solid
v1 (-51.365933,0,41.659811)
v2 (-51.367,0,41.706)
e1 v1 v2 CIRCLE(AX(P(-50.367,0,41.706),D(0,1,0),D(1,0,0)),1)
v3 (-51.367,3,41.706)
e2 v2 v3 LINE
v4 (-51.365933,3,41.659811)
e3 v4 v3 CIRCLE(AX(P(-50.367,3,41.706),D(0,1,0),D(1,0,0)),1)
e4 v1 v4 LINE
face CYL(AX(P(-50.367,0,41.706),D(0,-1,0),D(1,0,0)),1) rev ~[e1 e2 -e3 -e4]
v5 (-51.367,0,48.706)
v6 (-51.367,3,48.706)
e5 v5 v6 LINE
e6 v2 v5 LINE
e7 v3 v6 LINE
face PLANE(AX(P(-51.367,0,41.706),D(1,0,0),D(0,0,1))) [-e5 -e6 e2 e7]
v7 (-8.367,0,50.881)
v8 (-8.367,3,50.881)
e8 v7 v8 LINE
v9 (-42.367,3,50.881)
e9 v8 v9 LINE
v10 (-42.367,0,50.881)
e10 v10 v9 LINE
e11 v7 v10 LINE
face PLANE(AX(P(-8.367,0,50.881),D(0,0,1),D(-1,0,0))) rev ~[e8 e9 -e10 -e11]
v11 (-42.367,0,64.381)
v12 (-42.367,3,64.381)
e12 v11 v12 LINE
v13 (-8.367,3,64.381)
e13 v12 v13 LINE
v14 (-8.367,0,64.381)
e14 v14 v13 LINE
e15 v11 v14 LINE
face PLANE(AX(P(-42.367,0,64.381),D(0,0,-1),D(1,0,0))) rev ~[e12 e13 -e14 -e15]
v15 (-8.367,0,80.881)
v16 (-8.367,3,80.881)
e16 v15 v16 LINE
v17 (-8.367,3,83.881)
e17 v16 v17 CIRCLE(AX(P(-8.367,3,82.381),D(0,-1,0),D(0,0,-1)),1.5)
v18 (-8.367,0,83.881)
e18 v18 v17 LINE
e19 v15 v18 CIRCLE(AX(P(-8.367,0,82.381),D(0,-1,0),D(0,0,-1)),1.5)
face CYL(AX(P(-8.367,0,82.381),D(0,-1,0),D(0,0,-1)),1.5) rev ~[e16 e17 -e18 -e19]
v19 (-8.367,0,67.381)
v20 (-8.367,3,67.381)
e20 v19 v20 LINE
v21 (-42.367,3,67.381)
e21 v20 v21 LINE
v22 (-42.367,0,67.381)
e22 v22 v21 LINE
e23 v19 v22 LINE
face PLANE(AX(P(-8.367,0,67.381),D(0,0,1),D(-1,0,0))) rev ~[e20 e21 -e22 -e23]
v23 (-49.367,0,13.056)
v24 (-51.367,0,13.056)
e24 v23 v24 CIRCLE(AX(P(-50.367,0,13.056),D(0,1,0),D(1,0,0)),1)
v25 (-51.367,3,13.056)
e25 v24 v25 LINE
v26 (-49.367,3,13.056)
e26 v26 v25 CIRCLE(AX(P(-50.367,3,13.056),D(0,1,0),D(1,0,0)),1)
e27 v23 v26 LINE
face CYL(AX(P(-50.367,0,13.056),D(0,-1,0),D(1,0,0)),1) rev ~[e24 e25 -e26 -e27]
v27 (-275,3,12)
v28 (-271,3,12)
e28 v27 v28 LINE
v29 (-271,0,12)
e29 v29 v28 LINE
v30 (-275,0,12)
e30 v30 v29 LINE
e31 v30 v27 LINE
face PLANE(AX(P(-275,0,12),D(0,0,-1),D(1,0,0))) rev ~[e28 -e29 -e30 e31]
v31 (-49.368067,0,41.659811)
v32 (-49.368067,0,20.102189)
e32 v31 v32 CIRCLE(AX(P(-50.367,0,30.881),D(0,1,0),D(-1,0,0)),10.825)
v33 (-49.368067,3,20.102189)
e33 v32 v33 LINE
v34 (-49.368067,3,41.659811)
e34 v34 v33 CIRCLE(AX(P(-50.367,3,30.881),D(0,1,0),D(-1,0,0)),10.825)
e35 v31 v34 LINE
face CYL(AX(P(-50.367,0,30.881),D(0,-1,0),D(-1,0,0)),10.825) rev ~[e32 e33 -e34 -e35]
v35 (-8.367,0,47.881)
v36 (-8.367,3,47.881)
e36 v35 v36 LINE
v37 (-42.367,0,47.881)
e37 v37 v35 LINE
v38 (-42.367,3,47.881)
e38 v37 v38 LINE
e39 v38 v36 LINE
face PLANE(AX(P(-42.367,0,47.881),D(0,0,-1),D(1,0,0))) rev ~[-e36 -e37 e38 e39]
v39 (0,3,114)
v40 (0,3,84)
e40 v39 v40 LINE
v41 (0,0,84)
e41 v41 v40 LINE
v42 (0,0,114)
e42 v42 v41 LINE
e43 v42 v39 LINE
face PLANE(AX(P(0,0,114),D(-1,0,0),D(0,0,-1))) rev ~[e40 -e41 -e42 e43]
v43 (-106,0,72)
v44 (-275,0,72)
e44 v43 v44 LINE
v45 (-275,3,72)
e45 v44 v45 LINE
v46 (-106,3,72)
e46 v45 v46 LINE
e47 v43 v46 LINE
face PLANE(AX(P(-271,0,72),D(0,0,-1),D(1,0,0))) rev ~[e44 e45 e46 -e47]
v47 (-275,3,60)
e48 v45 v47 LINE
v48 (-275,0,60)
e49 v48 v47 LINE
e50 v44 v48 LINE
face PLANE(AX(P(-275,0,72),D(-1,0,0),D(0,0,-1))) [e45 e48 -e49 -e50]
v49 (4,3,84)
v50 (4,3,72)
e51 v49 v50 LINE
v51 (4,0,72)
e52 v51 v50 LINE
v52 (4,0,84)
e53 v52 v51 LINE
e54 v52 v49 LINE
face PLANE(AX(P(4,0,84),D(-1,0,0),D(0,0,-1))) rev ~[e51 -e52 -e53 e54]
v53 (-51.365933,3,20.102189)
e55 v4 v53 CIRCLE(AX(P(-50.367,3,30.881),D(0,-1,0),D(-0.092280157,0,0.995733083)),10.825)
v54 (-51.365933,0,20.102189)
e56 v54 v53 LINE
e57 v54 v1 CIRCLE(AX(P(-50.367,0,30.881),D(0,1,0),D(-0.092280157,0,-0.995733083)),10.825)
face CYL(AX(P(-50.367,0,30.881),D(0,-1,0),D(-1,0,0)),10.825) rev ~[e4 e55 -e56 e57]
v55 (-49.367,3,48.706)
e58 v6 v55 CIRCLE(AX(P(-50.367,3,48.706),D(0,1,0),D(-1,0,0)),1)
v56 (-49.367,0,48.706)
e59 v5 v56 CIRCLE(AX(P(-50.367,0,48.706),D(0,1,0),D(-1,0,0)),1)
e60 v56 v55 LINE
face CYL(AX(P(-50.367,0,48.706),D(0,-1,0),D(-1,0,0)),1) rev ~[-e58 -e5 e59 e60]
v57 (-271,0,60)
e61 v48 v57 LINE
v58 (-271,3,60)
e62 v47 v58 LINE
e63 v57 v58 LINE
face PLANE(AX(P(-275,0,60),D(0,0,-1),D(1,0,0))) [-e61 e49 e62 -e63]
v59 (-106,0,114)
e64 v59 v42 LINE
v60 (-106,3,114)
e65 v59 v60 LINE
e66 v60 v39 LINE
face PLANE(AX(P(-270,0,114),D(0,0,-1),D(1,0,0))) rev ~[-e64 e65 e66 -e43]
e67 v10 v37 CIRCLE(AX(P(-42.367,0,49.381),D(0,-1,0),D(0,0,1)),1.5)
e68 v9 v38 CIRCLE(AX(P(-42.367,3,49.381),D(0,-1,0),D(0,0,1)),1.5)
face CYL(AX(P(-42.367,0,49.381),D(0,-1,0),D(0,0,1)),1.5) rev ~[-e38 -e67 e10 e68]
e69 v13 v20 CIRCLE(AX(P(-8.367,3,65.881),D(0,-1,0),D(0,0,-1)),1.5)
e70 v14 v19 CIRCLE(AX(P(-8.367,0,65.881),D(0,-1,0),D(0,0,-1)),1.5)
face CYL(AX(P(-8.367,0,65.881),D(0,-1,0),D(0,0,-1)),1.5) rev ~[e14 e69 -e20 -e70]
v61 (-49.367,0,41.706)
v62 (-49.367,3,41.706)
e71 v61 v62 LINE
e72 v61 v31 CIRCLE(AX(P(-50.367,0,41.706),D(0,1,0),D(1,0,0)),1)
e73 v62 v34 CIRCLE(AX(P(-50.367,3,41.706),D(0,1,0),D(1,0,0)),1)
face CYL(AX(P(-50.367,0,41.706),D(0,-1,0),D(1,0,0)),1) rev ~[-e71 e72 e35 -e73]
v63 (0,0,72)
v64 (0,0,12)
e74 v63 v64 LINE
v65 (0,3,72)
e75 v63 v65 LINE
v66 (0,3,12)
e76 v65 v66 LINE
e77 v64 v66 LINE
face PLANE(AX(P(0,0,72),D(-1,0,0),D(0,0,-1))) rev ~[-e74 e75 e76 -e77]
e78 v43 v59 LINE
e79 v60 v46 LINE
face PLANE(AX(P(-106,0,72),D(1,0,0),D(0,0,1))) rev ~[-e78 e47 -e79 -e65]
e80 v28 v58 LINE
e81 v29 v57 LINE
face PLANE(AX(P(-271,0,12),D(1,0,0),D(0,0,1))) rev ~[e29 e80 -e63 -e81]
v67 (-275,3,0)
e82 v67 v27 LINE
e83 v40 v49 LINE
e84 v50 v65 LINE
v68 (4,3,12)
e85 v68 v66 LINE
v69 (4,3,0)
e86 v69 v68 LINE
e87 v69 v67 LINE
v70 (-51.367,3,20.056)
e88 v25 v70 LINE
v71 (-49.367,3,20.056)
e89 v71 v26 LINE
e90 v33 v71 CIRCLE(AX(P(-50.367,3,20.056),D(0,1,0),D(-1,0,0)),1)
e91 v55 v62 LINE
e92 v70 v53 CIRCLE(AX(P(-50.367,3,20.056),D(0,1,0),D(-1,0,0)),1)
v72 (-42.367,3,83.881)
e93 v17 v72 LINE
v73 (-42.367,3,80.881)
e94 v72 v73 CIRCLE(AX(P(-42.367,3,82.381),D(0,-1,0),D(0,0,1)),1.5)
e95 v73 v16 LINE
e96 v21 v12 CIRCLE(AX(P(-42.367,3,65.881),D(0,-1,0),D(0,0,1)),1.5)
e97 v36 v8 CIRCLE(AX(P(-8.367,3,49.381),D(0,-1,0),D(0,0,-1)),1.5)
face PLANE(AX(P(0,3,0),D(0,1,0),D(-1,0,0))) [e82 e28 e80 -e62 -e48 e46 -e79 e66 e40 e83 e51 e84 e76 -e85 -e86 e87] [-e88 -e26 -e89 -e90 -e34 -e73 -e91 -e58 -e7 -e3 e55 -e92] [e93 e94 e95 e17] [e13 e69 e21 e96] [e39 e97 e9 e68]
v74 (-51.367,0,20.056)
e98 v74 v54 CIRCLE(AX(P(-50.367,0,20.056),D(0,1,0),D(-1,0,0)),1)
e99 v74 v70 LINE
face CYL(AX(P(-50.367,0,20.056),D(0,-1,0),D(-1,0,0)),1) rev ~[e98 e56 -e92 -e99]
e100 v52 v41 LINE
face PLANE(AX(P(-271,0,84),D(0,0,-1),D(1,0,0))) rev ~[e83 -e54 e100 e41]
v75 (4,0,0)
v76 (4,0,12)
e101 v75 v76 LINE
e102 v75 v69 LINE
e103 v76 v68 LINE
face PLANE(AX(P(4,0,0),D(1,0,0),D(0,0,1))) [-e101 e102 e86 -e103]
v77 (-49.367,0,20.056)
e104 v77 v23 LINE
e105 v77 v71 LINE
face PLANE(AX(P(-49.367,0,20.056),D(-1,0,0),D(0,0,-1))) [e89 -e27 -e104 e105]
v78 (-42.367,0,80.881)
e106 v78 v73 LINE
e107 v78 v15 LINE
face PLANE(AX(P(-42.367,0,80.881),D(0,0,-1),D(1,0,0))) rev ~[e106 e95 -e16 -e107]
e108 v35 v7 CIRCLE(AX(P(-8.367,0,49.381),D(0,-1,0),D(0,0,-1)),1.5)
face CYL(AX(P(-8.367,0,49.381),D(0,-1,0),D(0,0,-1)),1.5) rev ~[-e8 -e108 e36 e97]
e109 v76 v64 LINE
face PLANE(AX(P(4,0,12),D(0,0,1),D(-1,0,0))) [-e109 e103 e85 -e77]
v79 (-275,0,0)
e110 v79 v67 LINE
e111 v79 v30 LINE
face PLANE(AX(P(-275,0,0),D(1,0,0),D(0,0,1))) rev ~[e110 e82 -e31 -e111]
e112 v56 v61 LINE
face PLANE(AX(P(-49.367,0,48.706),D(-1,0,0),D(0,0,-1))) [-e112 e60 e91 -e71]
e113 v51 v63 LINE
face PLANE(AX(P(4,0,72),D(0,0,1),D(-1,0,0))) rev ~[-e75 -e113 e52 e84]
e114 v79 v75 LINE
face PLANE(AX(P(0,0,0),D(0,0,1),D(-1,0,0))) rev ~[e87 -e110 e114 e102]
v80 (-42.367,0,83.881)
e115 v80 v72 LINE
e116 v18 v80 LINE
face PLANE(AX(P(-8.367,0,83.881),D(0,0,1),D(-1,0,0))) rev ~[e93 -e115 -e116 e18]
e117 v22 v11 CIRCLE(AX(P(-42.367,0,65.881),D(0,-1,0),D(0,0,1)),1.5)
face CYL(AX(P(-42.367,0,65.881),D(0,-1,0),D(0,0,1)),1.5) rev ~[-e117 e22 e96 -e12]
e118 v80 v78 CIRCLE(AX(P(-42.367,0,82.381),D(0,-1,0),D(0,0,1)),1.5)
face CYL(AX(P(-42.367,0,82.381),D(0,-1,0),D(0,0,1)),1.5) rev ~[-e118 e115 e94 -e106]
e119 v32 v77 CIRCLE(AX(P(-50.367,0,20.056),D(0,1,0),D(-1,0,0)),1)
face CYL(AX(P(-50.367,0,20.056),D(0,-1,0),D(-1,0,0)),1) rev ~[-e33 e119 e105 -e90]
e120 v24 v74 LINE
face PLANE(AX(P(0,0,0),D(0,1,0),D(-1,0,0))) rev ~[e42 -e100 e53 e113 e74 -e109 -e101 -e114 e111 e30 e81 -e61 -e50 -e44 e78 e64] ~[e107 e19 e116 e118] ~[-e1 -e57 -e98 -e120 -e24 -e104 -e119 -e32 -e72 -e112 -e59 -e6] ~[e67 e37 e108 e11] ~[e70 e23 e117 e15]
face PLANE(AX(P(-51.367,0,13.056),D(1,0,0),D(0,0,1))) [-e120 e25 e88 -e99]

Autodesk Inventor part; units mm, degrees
ref_plane "YZ Plane" through (0, 0, 0) normal (1, 0, 0) x (0, 1, 0)
ref_plane "XZ Plane" through (0, 0, 0) normal (0, 1, 0) x (-1, 0, 0)
ref_plane "XY Plane" through (0, 0, 0) normal (0, 0, 1) x (1, 0, 0)
sketch "Sketch1" plane through (0, 0, 0) normal (0, 1, 0) x (-1, 0, 0)
  line L0 (0, 0) -> (271, 0)
  line L1 (271, 0) -> (271, 84)
  line L2 (271, 84) -> (0, 84)
  line L3 (0, 84) -> (0, 0)
  line L4 (135.5, 84) -> (135.5, 0) construction
  line L5 (0, 84) -> (-4, 84)
  line L6 (-4, 84) -> (-4, 72)
  line L7 (-4, 72) -> (0, 72)
  line L8 (0, 72) -> (0, 84)
  line L9 (0, 0) -> (-4, 0)
  line L10 (-4, 0) -> (-4, 12)
  line L11 (-4, 12) -> (0, 12)
  line L12 (0, 12) -> (0, 0)
  line L13 (271, 84) -> (271, 0)
  line L14 (275, 72) -> (275, 60)
  line L15 (275, 60) -> (271, 60)
  line L16 (271, 60) -> (271, 84)
  line L17 (271, 0) -> (275, 0)
  line L18 (275, 0) -> (275, 12)
  line L19 (275, 12) -> (271, 12)
  line L20 (271, 12) -> (271, 0)
  arc A0 (51.367, 20.056) -> (49.367, 20.056) centre (50.367, 20.056) ccw
  arc A1 (49.367, 41.706) -> (51.367, 41.706) centre (50.367, 41.706) ccw
  line L21 (49.367, 48.706) -> (49.367, 41.706)
  line L22 (50.367, 41.706) -> (50.367, 48.706) construction
  line L23 (51.367, 41.706) -> (51.367, 48.706)
  arc A2 (51.367, 48.706) -> (49.367, 48.706) centre (50.367, 48.706) ccw
  circle A3 centre (50.367, 30.881) radius 10.825
  arc A4 (49.367, 13.056) -> (51.367, 13.056) centre (50.367, 13.056) ccw
  line L24 (49.367, 20.056) -> (49.367, 13.056)
  line L25 (50.367, 20.056) -> (50.367, 13.056) construction
  line L26 (51.367, 13.056) -> (51.367, 20.056)
  line L27 (275, 72) -> (271, 72)
  point P0 (50.367, 45.206)
  point P1 (50.367, 16.556)
  dimension "d0" = 271
  dimension "d2" = 4
  dimension "d3" = 12
  dimension "d4" = 4
  dimension "d5" = 12
  dimension "d20" = 21.65
  dimension "d21" = 7
  dimension "d22" = 2
  dimension "d23" = 7
  dimension "d24" = 2
  dimension "d56" = 50.367
  dimension "d57" = 30.881
  dimension "d58" = 48
  dimension "d59" = 12
  dimension "d60" = 12
extrude "Extrusion1" add sketch "Sketch1" along normal blind 3
sketch "Sketch3" plane through (0, 0, 0) normal (0, -1, 0) x (1, 0, 0)
  line L0 (4, 0) -> (-275, 0) projected
  line L1 (-270, 114) -> (0, 114)
  line L2 (0, 114) -> (0, 84)
  line L3 (0, 84) -> (-270, 84)
  line L4 (-270, 84) -> (-270, 114)
  line L5 (-275, 84) -> (4, 84) projected
  point P0 (0, 0)
  point P1 (-275, 72)
  point P2 (4, 84)
  dimension "d28" = 30
extrude "Extrusion2" add sketch "Sketch3" against normal blind 3
sketch "Sketch2" plane through (0, 0, 0) normal (0, -1, 0) x (1, 0, 0)
  circle A0 centre (-25.367, 65.881) radius 1.5 construction
  arc A1 (-49.3681, 20.1022) -> (-49.3681, 41.6598) centre (-50.367, 30.881) ccw construction
  line L0 (-8.367, 65.881) -> (-42.367, 65.881) construction
  line L1 (-8.367, 67.381) -> (-42.367, 67.381)
  line L2 (-42.367, 64.381) -> (-8.367, 64.381)
  arc A2 (-8.367, 64.381) -> (-8.367, 67.381) centre (-8.367, 65.881) ccw
  arc A3 (-42.367, 67.381) -> (-42.367, 64.381) centre (-42.367, 65.881) ccw
  line L3 (-8.367, 82.381) -> (-42.367, 82.381) construction
  line L4 (-8.367, 83.881) -> (-42.367, 83.881)
  line L5 (-42.367, 80.881) -> (-8.367, 80.881)
  arc A4 (-8.367, 80.881) -> (-8.367, 83.881) centre (-8.367, 82.381) ccw
  arc A5 (-42.367, 83.881) -> (-42.367, 80.881) centre (-42.367, 82.381) ccw
  line L6 (-8.367, 49.381) -> (-42.367, 49.381) construction
  line L7 (-8.367, 50.881) -> (-42.367, 50.881)
  line L8 (-42.367, 47.881) -> (-8.367, 47.881)
  arc A6 (-8.367, 47.881) -> (-8.367, 50.881) centre (-8.367, 49.381) ccw
  arc A7 (-42.367, 50.881) -> (-42.367, 47.881) centre (-42.367, 49.381) ccw
  line L9 (-42.367, 65.881) -> (-42.367, 49.381) construction
  line L10 (-42.367, 82.381) -> (-42.367, 65.881) construction
  point P0 (0, 0)
  point P1 (-25.367, 82.381)
  point P2 (-25.367, 49.381)
  dimension "d41" = 3
  dimension "d43" = 25
  dimension "d44" = 35
  dimension "d45" = 17
  dimension "d46" = 3
  dimension "d47" = 17
  dimension "d48" = 3
  dimension "d52" = 17
  dimension "d53" = 3
  dimension "d54" = 16.5
  dimension "d55" = 16.5
extrude "Extrusion3" cut sketch "Sketch2" against normal blind 3
sketch "Sketch4" plane through (0, 0, 0) normal (0, -1, 0) x (1, 0, 0)
  line L0 (-275, 72) -> (-271, 72) projected
  line L1 (-270, 114) -> (0, 114) projected
  line L2 (-271, 72) -> (-106, 72)
  line L3 (-106, 72) -> (-106, 114)
  line L4 (-106, 114) -> (-271, 114)
  line L5 (-271, 114) -> (-271, 72)
  point P0 (0, 0)
  dimension "d61" = 165
extrude "Extrusion4" cut sketch "Sketch4" along normal through all both and the other way through all
equation "\"d4\" = d2"
equation "\"d41\" = d40"
equation "\"d45\" = d52"
equation "\"d47\" = d52"
equation "\"d40\" = 3"
properties part number "flipper-support2"
